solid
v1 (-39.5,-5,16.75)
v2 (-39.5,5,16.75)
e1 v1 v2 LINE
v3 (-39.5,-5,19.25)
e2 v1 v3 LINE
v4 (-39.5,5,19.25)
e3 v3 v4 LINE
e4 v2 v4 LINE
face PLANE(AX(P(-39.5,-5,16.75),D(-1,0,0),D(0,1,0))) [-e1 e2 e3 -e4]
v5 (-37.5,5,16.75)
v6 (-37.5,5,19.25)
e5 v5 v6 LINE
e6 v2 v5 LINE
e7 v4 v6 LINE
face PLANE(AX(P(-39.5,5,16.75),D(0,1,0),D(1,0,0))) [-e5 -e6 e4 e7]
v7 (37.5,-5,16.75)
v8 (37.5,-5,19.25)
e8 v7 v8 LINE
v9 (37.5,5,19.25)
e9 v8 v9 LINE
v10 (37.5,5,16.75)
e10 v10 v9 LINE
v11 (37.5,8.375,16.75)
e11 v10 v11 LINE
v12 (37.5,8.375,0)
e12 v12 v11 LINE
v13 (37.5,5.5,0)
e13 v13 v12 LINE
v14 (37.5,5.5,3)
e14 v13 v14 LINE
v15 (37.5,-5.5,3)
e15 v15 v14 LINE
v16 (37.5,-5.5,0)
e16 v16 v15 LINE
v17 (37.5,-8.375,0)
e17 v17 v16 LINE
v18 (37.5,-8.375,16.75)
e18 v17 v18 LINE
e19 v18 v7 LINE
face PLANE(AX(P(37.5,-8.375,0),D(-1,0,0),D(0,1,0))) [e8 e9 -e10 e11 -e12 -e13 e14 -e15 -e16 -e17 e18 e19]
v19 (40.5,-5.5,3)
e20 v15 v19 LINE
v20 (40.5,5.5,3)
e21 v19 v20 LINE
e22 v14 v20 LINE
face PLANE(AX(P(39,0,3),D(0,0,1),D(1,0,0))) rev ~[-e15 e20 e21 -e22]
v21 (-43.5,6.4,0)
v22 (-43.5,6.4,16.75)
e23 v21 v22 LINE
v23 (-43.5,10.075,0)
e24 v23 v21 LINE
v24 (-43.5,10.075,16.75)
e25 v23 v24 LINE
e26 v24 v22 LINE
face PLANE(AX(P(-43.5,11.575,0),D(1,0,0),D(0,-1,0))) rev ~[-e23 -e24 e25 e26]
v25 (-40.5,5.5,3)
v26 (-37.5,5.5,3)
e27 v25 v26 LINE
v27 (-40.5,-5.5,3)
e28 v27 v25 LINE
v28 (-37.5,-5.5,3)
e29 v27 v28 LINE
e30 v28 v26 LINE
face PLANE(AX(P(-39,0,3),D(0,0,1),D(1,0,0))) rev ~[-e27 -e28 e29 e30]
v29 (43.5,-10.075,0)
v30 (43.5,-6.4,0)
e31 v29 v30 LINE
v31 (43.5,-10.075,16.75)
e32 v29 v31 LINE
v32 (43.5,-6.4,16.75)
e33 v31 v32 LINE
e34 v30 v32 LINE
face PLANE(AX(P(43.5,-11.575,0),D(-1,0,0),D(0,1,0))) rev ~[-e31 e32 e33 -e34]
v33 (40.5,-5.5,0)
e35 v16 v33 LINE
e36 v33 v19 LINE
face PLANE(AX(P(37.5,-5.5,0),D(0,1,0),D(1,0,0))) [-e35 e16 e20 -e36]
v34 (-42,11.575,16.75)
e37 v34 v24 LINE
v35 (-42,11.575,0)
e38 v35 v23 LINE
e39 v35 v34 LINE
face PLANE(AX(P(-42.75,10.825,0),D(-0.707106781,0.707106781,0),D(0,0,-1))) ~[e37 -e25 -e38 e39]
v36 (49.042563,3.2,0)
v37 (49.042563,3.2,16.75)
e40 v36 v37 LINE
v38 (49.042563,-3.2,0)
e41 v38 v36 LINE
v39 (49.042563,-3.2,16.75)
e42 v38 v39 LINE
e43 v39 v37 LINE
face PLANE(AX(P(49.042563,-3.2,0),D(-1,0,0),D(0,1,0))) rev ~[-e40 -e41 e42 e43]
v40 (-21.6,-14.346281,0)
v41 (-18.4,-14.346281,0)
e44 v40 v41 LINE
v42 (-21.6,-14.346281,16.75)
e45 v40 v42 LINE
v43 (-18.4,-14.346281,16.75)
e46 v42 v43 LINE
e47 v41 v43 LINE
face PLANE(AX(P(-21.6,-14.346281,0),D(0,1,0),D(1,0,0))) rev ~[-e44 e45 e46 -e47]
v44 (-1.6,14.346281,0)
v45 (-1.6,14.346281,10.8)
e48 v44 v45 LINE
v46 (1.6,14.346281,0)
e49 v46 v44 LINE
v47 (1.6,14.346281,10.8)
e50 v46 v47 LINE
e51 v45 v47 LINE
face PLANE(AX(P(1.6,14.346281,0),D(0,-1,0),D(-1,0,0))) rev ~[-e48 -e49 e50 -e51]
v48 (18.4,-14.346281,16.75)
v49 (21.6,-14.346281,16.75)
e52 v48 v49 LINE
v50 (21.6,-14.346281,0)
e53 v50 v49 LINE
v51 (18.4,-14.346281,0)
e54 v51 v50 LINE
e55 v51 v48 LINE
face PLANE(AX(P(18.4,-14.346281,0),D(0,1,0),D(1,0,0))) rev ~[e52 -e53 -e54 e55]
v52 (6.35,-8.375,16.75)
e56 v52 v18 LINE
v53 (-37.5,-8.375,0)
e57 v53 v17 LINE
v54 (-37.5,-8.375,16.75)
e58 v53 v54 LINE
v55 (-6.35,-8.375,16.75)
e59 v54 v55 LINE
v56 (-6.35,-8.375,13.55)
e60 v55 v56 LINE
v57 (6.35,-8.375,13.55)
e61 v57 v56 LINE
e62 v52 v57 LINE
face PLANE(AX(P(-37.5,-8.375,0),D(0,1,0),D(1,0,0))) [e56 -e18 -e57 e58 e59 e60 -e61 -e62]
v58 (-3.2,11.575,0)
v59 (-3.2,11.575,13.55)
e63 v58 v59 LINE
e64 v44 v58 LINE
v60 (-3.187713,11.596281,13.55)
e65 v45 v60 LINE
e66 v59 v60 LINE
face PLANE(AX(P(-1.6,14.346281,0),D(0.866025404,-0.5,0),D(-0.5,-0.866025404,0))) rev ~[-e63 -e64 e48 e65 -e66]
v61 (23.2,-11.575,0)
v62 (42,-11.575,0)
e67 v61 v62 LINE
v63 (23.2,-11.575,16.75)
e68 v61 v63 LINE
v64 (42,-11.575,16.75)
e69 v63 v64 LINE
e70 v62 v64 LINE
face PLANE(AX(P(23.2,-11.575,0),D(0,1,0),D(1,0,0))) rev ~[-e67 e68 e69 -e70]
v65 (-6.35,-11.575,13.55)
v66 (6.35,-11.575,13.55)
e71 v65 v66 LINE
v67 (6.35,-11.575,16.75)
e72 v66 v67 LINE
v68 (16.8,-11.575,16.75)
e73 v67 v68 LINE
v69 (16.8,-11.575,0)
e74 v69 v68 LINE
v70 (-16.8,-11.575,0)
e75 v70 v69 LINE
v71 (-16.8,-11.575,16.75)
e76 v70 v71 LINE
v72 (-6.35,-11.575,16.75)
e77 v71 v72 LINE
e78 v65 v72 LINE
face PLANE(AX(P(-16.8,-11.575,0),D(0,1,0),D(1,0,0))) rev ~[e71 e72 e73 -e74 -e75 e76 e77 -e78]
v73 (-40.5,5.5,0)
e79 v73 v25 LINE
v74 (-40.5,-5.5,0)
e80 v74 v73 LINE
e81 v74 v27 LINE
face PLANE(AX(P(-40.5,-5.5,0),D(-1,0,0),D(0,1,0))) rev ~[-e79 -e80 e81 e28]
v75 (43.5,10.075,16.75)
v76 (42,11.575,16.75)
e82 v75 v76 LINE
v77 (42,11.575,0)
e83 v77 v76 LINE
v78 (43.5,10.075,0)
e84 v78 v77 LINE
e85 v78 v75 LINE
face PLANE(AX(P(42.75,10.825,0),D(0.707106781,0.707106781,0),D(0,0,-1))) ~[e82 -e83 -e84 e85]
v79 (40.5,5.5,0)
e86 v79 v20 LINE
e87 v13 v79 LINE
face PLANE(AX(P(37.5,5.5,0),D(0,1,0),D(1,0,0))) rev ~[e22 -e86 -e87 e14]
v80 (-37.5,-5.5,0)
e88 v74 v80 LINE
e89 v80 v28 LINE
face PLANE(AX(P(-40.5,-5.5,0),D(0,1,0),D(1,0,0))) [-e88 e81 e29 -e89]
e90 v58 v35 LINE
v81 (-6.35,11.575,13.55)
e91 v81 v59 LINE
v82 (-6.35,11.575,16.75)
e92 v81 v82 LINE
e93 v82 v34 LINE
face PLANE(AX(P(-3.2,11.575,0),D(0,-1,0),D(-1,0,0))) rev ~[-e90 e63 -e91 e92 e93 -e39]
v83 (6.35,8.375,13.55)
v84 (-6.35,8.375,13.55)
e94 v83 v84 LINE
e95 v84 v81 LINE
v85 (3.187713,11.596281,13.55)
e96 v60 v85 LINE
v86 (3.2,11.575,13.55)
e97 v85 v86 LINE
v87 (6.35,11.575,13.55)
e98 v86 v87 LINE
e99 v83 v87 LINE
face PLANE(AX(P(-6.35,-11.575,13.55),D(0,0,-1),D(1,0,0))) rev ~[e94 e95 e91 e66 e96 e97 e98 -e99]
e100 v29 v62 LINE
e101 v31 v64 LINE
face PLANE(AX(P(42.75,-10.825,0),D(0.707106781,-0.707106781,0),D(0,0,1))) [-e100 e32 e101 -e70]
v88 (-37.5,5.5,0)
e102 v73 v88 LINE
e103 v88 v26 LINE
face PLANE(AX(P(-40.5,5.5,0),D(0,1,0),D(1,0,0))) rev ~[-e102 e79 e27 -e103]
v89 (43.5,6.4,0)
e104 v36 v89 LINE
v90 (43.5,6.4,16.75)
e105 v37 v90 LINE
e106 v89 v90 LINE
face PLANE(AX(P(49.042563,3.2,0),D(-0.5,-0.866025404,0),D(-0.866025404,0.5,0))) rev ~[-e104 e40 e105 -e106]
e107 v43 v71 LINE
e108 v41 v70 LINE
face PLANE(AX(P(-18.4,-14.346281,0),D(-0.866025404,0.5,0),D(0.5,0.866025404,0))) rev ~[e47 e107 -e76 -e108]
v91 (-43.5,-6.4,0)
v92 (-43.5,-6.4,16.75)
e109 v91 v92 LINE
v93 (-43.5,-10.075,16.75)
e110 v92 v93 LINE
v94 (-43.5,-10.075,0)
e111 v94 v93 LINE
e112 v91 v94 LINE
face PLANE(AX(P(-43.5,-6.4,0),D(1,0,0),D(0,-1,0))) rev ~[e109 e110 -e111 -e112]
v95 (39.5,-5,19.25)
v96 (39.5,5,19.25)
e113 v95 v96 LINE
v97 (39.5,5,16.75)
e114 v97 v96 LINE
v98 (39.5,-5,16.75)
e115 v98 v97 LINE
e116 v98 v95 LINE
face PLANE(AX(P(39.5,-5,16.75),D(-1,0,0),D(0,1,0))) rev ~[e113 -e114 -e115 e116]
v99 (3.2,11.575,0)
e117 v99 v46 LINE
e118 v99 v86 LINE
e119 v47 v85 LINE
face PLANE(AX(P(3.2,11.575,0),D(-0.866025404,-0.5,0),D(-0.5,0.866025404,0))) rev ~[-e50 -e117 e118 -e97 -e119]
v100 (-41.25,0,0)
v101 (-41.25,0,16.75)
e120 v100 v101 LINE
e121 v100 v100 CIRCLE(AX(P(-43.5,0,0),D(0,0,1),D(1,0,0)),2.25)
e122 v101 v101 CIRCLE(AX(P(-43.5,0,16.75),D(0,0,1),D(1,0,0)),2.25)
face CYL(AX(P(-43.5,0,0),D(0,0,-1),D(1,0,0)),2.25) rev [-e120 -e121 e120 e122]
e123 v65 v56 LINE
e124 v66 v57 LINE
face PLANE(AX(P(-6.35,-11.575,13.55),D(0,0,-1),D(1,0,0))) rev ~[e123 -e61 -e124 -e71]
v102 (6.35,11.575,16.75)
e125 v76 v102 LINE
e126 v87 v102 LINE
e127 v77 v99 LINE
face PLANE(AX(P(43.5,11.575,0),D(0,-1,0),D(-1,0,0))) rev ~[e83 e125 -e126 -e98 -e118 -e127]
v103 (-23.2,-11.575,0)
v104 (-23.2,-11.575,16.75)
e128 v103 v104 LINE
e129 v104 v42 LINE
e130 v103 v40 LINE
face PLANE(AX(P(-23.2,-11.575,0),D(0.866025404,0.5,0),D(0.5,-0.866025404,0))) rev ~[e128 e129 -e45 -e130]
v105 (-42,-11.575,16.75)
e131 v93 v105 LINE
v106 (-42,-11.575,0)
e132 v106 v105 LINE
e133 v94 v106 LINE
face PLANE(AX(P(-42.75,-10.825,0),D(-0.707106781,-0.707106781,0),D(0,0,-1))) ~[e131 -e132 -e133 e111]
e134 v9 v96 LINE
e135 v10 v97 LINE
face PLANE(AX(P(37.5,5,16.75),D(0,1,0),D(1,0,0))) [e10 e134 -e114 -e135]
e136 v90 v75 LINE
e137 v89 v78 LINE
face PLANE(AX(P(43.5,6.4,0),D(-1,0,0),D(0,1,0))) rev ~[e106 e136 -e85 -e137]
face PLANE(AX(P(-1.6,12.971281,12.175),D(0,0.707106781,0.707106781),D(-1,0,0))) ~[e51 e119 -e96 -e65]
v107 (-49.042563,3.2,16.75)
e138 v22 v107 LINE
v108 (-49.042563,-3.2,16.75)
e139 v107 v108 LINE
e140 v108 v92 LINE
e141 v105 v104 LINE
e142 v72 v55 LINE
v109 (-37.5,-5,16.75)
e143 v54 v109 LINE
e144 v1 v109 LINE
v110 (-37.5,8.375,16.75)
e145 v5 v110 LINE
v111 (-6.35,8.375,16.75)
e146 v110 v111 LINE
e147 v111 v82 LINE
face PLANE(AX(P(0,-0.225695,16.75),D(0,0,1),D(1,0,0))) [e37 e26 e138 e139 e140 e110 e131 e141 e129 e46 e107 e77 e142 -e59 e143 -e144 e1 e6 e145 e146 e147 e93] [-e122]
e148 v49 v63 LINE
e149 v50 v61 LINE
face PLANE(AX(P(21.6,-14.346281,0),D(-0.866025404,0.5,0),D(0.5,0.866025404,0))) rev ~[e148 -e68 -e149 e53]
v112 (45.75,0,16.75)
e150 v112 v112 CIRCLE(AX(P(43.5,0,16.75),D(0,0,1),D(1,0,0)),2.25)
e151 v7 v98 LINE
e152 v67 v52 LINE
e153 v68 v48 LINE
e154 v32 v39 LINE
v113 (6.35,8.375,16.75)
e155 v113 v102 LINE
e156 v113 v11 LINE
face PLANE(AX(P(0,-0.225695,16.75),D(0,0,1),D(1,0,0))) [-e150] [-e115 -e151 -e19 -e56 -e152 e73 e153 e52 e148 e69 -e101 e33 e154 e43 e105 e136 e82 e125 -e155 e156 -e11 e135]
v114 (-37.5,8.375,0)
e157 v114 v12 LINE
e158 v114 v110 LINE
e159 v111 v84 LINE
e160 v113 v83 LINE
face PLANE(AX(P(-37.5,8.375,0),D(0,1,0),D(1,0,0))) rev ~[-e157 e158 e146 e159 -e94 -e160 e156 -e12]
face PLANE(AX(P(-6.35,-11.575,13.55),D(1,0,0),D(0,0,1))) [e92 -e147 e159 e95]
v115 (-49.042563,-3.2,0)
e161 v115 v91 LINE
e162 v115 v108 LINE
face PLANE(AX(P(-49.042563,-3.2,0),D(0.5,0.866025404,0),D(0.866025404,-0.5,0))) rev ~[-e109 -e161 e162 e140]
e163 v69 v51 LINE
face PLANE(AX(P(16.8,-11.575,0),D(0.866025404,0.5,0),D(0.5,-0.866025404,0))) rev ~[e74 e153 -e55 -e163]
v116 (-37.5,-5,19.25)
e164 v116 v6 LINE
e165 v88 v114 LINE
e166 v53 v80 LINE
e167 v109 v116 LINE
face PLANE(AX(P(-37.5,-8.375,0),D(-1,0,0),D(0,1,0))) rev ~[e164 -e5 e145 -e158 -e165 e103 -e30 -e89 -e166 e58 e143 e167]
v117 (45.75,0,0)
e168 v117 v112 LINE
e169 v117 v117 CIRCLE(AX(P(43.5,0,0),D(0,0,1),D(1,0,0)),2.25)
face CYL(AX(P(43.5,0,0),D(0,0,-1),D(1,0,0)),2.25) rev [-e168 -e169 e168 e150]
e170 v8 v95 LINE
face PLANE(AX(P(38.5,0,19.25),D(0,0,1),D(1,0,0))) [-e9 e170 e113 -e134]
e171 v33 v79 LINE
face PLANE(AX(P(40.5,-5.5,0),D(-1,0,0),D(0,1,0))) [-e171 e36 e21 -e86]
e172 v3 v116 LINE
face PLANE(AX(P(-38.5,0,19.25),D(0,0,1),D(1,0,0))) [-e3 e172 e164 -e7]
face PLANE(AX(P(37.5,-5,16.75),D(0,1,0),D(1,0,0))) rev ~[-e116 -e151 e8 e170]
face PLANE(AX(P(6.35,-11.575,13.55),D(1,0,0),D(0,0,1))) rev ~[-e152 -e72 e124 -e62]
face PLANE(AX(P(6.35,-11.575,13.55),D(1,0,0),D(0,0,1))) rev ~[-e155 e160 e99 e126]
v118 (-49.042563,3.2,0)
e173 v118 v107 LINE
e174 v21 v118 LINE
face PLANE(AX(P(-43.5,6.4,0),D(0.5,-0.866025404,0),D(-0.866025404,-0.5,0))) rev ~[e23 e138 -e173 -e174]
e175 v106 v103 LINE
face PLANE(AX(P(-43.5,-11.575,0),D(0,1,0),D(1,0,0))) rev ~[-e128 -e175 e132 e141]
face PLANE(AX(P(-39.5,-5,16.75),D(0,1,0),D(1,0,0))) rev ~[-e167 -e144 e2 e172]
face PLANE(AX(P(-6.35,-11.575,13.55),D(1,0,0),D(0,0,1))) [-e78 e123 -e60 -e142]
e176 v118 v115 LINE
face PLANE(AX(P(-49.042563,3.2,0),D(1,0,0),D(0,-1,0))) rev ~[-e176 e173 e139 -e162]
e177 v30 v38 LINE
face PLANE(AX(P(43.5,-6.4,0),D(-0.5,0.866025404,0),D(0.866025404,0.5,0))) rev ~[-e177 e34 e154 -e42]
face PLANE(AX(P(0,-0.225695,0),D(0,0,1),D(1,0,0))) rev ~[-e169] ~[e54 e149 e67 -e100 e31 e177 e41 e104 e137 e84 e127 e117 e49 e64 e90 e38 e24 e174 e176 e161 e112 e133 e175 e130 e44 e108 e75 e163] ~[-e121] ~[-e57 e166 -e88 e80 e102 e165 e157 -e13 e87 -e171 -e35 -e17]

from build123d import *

# Parameters (mm, degrees)
F0_R     = 2.25
F0_W     = 75
F0_H     = 16.75
F1_DEPTH = 16.75
F2_SIZE  = 1.5
F3_W     = 3
F3_H     = 11
F4_DEPTH = 3
F5_W     = 2
F5_H     = 10
F6_DEPTH = 2.5
F7_W     = 12.7
F7_H     = 6.4
F8_DEPTH = 25.9222812921
F9_SIZE  = 2.75


with BuildPart() as f1:
    # F0 (on Top) → F1 (new body)
    with BuildSketch(Plane.XY):
        Polygon((43.5, 6.4), (43.5, 11.575), (3.2, 11.575), (1.6, 14.3462812921), (-1.6, 14.3462812921), (-3.2, 11.575), (-43.5, 11.575), (-43.5, 6.4), (-49.0425625842, 3.2), (-49.0425625842, -3.2), (-43.5, -6.4), (-43.5, -11.575), (-23.2, -11.575), (-21.6, -14.3462812921), (-18.4, -14.3462812921), (-16.8, -11.575), (16.8, -11.575), (18.4, -14.3462812921), (21.6, -14.3462812921), (23.2, -11.575), (43.5, -11.575), (43.5, -6.4), (49.0425625842, -3.2), (49.0425625842, 3.2), align=None)
        with Locations((-43.5, 0)):
            Circle(F0_R, mode=Mode.SUBTRACT)
        Rectangle(F0_W, F0_H, mode=Mode.SUBTRACT)
        with Locations((43.5, 0)):
            Circle(F0_R, mode=Mode.SUBTRACT)
    extrude(amount=F1_DEPTH)

    # F2
    f2_edges = [f1.edges().sort_by_distance(p)[0] for p in [
        (-43.5, 11.575, 8.375),
        (43.5, 11.575, 8.375),
        (43.5, -11.575, 8.375),
        (-43.5, -11.575, 8.375),
    ]]
    chamfer(f2_edges, length=F2_SIZE)

    # F3 (on Top) → F4 (cut)
    with BuildSketch(Plane.XY):
        with Locations((-39, 0)):
            Rectangle(F3_W, F3_H)
        with Locations((39, 0)):
            Rectangle(F3_W, F3_H)
    extrude(amount=F4_DEPTH, mode=Mode.SUBTRACT)

    # F5 (on face) → F6 (join)
    with BuildSketch(Plane.XY.offset(16.75)):
        with Locations((-38.5, 0)):
            Rectangle(F5_W, F5_H)
        with Locations((38.5, 0)):
            Rectangle(F5_W, F5_H)
    extrude(amount=F6_DEPTH)

    # F7 (on face) → F8 (cut, through all)
    with BuildSketch(Plane.XZ.offset(11.575)):
        with Locations((0, 16.75)):
            Rectangle(F7_W, F7_H)
    extrude(amount=-F8_DEPTH, mode=Mode.SUBTRACT)

    # F9
    f9_edges = [f1.edges().sort_by_distance(p)[0] for p in [
        (0, 14.346281, 13.55),
    ]]
    chamfer(f9_edges, length=F9_SIZE)


solid = f1.part
